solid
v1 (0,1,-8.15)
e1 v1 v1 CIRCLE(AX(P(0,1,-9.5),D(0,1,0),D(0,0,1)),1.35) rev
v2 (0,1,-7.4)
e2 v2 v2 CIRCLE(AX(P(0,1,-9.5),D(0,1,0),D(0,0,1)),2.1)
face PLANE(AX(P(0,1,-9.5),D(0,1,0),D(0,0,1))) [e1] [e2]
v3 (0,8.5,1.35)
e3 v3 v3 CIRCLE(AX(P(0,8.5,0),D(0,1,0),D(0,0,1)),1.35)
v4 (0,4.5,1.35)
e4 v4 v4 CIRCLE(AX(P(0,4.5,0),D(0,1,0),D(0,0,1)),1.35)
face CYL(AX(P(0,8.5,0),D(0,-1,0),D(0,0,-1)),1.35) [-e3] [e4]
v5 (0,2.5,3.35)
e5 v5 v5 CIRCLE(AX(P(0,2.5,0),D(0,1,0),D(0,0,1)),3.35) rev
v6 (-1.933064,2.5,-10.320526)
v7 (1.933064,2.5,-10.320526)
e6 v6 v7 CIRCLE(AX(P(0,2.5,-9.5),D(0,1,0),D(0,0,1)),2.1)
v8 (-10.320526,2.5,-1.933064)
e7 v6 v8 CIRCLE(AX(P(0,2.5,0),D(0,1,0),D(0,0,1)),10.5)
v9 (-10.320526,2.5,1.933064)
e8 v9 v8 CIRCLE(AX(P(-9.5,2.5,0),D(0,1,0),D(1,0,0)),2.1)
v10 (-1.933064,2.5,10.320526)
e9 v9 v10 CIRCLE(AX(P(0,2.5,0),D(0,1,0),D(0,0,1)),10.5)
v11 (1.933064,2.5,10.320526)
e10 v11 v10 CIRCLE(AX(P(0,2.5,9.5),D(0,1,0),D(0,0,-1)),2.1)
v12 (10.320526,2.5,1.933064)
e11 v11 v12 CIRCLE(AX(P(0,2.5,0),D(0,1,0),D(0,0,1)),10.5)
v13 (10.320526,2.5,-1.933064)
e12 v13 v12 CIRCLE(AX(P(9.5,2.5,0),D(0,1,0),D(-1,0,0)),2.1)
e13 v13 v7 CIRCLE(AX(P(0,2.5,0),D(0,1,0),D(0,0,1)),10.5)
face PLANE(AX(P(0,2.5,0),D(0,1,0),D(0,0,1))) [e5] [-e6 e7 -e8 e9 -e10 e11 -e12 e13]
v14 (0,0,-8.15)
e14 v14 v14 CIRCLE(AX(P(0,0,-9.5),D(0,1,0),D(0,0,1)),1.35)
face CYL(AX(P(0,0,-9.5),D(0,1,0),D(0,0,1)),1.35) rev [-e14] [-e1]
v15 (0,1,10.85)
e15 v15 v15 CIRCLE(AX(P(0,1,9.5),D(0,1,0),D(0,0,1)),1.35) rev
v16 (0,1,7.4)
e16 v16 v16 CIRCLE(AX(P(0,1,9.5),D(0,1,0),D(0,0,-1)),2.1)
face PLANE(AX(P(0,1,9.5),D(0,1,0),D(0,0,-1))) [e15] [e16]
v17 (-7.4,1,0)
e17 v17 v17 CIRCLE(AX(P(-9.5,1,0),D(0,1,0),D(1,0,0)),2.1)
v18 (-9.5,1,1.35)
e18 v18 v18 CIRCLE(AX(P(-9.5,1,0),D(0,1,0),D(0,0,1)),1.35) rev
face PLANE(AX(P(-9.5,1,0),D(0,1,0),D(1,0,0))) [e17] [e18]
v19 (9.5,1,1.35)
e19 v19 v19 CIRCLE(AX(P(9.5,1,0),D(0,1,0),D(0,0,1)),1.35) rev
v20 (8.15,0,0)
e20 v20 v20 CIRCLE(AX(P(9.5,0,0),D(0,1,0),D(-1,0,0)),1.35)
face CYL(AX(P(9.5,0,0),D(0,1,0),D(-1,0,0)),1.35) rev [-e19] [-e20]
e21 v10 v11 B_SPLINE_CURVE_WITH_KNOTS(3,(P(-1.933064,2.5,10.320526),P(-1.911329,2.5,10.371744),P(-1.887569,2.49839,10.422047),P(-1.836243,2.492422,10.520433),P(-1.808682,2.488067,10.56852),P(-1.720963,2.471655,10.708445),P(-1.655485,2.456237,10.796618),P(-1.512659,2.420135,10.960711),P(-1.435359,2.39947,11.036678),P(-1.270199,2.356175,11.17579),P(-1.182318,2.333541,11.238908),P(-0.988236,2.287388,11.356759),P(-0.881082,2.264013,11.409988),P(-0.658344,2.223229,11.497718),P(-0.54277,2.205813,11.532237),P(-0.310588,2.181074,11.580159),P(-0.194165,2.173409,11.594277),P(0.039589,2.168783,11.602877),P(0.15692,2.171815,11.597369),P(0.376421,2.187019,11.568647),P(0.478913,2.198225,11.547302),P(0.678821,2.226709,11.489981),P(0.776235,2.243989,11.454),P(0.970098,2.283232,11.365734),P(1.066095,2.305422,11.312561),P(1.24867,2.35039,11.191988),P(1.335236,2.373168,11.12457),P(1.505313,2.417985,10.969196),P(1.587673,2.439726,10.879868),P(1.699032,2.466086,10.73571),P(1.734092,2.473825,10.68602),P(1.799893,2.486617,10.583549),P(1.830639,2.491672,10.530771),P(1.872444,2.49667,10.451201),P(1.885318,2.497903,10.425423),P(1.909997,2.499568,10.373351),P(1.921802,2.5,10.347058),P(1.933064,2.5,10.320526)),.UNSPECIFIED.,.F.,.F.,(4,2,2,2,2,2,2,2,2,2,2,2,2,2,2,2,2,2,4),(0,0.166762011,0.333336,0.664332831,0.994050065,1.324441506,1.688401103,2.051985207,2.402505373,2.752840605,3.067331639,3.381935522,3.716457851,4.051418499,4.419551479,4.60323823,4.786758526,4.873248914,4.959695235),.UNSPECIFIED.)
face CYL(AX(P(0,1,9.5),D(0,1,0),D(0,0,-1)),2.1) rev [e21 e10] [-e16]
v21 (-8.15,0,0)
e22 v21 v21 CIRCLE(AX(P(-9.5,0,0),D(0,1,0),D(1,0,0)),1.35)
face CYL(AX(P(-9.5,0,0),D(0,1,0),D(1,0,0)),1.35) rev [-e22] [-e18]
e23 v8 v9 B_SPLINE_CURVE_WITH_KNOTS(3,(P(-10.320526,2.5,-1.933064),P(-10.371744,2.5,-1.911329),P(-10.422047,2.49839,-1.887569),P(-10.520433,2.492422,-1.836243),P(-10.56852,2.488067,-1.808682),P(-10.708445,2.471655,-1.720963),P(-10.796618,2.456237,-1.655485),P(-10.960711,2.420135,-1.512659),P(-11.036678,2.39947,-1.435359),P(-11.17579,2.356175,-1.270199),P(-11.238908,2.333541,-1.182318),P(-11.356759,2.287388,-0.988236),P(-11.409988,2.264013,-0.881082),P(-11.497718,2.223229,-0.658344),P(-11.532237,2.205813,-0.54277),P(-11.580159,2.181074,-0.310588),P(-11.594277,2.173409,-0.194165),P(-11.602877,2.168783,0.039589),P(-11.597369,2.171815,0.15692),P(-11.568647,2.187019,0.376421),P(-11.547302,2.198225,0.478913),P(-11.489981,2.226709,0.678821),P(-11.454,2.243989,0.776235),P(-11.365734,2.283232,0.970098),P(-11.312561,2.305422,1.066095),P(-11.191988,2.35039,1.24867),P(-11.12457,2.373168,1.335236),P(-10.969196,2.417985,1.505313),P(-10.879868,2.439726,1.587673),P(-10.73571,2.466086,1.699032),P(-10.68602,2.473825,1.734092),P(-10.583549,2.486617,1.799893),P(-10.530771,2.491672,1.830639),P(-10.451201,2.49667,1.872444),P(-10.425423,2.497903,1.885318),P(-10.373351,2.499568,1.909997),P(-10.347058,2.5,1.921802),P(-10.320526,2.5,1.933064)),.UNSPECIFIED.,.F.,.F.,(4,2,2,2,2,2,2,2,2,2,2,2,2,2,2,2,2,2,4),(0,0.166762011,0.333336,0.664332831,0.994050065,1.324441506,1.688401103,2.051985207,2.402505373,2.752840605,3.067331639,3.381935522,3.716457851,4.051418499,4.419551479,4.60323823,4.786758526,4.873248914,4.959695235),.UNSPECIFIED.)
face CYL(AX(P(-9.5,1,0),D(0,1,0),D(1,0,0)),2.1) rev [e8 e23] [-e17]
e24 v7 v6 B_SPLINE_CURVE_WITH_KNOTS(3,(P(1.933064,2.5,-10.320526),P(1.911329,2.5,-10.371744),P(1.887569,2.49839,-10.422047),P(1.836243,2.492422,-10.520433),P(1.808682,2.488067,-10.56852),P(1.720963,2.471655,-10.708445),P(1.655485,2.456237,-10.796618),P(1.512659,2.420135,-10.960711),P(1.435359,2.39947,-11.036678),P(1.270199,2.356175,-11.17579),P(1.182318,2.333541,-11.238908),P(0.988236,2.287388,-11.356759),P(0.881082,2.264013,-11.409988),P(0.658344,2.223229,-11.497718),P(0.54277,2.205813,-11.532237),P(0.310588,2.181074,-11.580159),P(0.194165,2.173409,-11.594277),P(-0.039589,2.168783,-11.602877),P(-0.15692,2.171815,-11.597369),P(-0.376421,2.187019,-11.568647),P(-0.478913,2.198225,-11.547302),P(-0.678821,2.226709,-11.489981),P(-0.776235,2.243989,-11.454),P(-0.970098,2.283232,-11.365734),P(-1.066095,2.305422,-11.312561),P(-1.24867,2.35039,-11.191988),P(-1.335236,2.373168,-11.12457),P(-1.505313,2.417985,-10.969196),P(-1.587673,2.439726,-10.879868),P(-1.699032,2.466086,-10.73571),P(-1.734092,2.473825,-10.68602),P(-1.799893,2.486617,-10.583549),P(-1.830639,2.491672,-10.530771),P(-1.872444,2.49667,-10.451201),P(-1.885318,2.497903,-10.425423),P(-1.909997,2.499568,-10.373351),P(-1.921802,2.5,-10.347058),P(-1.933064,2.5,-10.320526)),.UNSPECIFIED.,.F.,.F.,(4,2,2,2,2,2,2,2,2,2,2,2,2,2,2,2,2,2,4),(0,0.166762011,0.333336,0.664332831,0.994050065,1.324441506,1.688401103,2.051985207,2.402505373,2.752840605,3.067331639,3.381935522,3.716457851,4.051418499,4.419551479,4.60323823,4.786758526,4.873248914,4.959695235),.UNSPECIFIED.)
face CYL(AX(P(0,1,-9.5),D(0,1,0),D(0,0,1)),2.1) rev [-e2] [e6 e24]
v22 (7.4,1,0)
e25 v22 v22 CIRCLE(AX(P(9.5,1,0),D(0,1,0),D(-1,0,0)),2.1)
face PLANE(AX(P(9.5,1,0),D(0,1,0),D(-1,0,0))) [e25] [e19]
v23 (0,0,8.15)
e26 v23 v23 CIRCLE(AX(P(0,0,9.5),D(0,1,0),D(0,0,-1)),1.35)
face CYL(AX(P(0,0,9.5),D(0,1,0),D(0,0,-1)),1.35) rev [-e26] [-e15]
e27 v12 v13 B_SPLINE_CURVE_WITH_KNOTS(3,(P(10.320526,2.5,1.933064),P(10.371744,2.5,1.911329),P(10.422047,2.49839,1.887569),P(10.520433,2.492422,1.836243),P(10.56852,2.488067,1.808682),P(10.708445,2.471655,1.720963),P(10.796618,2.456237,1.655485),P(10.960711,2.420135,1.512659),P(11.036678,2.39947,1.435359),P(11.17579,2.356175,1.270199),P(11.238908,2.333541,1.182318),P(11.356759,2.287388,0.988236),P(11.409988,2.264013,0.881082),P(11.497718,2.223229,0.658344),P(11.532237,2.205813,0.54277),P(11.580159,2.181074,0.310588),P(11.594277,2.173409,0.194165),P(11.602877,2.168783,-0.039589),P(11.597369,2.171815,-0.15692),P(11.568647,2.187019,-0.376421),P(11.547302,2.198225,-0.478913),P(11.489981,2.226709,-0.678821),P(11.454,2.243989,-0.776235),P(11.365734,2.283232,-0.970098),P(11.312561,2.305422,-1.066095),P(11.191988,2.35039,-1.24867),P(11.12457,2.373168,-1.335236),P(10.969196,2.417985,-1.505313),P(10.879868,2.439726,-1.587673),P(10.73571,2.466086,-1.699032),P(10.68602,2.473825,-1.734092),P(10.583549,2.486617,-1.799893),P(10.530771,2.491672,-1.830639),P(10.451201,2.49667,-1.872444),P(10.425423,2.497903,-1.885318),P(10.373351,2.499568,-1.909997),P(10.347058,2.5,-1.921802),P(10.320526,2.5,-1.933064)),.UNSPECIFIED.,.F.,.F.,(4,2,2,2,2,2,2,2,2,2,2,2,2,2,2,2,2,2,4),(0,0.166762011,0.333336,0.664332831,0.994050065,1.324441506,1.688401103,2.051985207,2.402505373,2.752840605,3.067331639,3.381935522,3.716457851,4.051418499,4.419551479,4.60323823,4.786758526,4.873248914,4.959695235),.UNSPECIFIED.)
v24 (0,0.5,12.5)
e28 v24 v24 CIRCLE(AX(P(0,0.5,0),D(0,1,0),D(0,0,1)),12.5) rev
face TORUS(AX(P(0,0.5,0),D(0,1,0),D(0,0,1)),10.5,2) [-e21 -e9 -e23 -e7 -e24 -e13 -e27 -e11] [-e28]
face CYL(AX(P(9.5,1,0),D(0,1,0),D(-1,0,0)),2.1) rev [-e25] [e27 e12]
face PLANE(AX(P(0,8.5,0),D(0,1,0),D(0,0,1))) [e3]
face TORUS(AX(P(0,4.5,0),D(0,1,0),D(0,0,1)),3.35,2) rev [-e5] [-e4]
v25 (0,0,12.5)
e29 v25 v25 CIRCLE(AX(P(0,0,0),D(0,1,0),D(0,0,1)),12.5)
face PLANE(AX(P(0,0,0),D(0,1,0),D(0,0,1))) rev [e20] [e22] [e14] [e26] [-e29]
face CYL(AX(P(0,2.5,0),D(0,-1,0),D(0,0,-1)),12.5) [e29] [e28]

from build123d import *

# Parameters (mm, degrees)
SKETCH1_R           = 12.5
BOSS_EXTRUDE1_DEPTH = 2.5
SKETCH2_R           = 1.35
CUT_EXTRUDE1_DEPTH  = 18.853571071
SKETCH4_R           = 2.1
CUT_EXTRUDE2_DEPTH  = 1.5
CIRPATTERN1_COUNT   = 4
SKETCH3_R           = 1.35
BOSS_EXTRUDE2_DEPTH = 6
FILLET2_R           = 2
FILLET3_R           = 2


with BuildPart() as part:
    # Sketch1 → Boss-Extrude1 (new body)
    with BuildSketch(Plane(origin=(0, 0, 0), x_dir=(1, 0, 0), z_dir=(0, 1, 0))):
        with Locations(Location((0, 0, 0), (0, 0, 270))):
            Circle(SKETCH1_R)
    extrude(amount=BOSS_EXTRUDE1_DEPTH)

    # Sketch2 → Cut-Extrude1 (cut, through all)
    with BuildSketch(Plane(origin=(0, 2.5, 0), x_dir=(1, 0, 0), z_dir=(0, 1, 0))):
        with Locations(Location((0, 9.5, 0), (0, 0, 270))):
            Circle(SKETCH2_R)
    cut_extrude1 = extrude(amount=-CUT_EXTRUDE1_DEPTH, mode=Mode.SUBTRACT)

    # Sketch4 → Cut-Extrude2 (cut)
    with BuildSketch(Plane(origin=(0, 2.5, 0), x_dir=(1, 0, 0), z_dir=(0, 1, 0))):
        with Locations(Location((0, 9.5, 0), (0, 0, 270))):
            Circle(SKETCH4_R)
    cut_extrude2 = extrude(amount=-CUT_EXTRUDE2_DEPTH, mode=Mode.SUBTRACT)

    # CirPattern1: Cut-Extrude1, Cut-Extrude2 ×4 about axis
    cirpattern1_axis = Axis((0, 0, 0), (0, 1, 0))
    add([cut_extrude1.rotate(cirpattern1_axis, i * 360 / CIRPATTERN1_COUNT) for i in range(1, CIRPATTERN1_COUNT)], mode=Mode.SUBTRACT)
    add([cut_extrude2.rotate(cirpattern1_axis, i * 360 / CIRPATTERN1_COUNT) for i in range(1, CIRPATTERN1_COUNT)], mode=Mode.SUBTRACT)

    # Sketch3 → Boss-Extrude2 (add)
    with BuildSketch(Plane(origin=(0, 2.5, 0), x_dir=(1, 0, 0), z_dir=(0, 1, 0))):
        with Locations(Location((0, 0, 0), (0, 0, 270))):
            Circle(SKETCH3_R)
    extrude(amount=BOSS_EXTRUDE2_DEPTH)

    # Fillet2
    fillet2_edges = [part.edges().sort_by_distance(p)[0] for p in [
        (0, 2.5, -1.35),
    ]]
    fillet(fillet2_edges, radius=FILLET2_R)

    # Fillet3
    # the kernel refuses this fillet: 2 mm, written as the material it takes off along each edge
    with BuildSketch(Plane(origin=(0, 2.5, 0), x_dir=(0, 0, 1), z_dir=(-1, 0, 0))) as fillet3_piece_1:
        with BuildLine():
            CenterArc((12.5 - FILLET3_R, -FILLET3_R), FILLET3_R, 0, 90)
            Line((12.5, -FILLET3_R), (12.5, 0))
            Line((12.5, 0), (12.5 - FILLET3_R, 0))
        make_face()
    revolve(axis=Axis((0, 2.5, 0), (0, 1, 0)), mode=Mode.SUBTRACT)


solid = part.part
